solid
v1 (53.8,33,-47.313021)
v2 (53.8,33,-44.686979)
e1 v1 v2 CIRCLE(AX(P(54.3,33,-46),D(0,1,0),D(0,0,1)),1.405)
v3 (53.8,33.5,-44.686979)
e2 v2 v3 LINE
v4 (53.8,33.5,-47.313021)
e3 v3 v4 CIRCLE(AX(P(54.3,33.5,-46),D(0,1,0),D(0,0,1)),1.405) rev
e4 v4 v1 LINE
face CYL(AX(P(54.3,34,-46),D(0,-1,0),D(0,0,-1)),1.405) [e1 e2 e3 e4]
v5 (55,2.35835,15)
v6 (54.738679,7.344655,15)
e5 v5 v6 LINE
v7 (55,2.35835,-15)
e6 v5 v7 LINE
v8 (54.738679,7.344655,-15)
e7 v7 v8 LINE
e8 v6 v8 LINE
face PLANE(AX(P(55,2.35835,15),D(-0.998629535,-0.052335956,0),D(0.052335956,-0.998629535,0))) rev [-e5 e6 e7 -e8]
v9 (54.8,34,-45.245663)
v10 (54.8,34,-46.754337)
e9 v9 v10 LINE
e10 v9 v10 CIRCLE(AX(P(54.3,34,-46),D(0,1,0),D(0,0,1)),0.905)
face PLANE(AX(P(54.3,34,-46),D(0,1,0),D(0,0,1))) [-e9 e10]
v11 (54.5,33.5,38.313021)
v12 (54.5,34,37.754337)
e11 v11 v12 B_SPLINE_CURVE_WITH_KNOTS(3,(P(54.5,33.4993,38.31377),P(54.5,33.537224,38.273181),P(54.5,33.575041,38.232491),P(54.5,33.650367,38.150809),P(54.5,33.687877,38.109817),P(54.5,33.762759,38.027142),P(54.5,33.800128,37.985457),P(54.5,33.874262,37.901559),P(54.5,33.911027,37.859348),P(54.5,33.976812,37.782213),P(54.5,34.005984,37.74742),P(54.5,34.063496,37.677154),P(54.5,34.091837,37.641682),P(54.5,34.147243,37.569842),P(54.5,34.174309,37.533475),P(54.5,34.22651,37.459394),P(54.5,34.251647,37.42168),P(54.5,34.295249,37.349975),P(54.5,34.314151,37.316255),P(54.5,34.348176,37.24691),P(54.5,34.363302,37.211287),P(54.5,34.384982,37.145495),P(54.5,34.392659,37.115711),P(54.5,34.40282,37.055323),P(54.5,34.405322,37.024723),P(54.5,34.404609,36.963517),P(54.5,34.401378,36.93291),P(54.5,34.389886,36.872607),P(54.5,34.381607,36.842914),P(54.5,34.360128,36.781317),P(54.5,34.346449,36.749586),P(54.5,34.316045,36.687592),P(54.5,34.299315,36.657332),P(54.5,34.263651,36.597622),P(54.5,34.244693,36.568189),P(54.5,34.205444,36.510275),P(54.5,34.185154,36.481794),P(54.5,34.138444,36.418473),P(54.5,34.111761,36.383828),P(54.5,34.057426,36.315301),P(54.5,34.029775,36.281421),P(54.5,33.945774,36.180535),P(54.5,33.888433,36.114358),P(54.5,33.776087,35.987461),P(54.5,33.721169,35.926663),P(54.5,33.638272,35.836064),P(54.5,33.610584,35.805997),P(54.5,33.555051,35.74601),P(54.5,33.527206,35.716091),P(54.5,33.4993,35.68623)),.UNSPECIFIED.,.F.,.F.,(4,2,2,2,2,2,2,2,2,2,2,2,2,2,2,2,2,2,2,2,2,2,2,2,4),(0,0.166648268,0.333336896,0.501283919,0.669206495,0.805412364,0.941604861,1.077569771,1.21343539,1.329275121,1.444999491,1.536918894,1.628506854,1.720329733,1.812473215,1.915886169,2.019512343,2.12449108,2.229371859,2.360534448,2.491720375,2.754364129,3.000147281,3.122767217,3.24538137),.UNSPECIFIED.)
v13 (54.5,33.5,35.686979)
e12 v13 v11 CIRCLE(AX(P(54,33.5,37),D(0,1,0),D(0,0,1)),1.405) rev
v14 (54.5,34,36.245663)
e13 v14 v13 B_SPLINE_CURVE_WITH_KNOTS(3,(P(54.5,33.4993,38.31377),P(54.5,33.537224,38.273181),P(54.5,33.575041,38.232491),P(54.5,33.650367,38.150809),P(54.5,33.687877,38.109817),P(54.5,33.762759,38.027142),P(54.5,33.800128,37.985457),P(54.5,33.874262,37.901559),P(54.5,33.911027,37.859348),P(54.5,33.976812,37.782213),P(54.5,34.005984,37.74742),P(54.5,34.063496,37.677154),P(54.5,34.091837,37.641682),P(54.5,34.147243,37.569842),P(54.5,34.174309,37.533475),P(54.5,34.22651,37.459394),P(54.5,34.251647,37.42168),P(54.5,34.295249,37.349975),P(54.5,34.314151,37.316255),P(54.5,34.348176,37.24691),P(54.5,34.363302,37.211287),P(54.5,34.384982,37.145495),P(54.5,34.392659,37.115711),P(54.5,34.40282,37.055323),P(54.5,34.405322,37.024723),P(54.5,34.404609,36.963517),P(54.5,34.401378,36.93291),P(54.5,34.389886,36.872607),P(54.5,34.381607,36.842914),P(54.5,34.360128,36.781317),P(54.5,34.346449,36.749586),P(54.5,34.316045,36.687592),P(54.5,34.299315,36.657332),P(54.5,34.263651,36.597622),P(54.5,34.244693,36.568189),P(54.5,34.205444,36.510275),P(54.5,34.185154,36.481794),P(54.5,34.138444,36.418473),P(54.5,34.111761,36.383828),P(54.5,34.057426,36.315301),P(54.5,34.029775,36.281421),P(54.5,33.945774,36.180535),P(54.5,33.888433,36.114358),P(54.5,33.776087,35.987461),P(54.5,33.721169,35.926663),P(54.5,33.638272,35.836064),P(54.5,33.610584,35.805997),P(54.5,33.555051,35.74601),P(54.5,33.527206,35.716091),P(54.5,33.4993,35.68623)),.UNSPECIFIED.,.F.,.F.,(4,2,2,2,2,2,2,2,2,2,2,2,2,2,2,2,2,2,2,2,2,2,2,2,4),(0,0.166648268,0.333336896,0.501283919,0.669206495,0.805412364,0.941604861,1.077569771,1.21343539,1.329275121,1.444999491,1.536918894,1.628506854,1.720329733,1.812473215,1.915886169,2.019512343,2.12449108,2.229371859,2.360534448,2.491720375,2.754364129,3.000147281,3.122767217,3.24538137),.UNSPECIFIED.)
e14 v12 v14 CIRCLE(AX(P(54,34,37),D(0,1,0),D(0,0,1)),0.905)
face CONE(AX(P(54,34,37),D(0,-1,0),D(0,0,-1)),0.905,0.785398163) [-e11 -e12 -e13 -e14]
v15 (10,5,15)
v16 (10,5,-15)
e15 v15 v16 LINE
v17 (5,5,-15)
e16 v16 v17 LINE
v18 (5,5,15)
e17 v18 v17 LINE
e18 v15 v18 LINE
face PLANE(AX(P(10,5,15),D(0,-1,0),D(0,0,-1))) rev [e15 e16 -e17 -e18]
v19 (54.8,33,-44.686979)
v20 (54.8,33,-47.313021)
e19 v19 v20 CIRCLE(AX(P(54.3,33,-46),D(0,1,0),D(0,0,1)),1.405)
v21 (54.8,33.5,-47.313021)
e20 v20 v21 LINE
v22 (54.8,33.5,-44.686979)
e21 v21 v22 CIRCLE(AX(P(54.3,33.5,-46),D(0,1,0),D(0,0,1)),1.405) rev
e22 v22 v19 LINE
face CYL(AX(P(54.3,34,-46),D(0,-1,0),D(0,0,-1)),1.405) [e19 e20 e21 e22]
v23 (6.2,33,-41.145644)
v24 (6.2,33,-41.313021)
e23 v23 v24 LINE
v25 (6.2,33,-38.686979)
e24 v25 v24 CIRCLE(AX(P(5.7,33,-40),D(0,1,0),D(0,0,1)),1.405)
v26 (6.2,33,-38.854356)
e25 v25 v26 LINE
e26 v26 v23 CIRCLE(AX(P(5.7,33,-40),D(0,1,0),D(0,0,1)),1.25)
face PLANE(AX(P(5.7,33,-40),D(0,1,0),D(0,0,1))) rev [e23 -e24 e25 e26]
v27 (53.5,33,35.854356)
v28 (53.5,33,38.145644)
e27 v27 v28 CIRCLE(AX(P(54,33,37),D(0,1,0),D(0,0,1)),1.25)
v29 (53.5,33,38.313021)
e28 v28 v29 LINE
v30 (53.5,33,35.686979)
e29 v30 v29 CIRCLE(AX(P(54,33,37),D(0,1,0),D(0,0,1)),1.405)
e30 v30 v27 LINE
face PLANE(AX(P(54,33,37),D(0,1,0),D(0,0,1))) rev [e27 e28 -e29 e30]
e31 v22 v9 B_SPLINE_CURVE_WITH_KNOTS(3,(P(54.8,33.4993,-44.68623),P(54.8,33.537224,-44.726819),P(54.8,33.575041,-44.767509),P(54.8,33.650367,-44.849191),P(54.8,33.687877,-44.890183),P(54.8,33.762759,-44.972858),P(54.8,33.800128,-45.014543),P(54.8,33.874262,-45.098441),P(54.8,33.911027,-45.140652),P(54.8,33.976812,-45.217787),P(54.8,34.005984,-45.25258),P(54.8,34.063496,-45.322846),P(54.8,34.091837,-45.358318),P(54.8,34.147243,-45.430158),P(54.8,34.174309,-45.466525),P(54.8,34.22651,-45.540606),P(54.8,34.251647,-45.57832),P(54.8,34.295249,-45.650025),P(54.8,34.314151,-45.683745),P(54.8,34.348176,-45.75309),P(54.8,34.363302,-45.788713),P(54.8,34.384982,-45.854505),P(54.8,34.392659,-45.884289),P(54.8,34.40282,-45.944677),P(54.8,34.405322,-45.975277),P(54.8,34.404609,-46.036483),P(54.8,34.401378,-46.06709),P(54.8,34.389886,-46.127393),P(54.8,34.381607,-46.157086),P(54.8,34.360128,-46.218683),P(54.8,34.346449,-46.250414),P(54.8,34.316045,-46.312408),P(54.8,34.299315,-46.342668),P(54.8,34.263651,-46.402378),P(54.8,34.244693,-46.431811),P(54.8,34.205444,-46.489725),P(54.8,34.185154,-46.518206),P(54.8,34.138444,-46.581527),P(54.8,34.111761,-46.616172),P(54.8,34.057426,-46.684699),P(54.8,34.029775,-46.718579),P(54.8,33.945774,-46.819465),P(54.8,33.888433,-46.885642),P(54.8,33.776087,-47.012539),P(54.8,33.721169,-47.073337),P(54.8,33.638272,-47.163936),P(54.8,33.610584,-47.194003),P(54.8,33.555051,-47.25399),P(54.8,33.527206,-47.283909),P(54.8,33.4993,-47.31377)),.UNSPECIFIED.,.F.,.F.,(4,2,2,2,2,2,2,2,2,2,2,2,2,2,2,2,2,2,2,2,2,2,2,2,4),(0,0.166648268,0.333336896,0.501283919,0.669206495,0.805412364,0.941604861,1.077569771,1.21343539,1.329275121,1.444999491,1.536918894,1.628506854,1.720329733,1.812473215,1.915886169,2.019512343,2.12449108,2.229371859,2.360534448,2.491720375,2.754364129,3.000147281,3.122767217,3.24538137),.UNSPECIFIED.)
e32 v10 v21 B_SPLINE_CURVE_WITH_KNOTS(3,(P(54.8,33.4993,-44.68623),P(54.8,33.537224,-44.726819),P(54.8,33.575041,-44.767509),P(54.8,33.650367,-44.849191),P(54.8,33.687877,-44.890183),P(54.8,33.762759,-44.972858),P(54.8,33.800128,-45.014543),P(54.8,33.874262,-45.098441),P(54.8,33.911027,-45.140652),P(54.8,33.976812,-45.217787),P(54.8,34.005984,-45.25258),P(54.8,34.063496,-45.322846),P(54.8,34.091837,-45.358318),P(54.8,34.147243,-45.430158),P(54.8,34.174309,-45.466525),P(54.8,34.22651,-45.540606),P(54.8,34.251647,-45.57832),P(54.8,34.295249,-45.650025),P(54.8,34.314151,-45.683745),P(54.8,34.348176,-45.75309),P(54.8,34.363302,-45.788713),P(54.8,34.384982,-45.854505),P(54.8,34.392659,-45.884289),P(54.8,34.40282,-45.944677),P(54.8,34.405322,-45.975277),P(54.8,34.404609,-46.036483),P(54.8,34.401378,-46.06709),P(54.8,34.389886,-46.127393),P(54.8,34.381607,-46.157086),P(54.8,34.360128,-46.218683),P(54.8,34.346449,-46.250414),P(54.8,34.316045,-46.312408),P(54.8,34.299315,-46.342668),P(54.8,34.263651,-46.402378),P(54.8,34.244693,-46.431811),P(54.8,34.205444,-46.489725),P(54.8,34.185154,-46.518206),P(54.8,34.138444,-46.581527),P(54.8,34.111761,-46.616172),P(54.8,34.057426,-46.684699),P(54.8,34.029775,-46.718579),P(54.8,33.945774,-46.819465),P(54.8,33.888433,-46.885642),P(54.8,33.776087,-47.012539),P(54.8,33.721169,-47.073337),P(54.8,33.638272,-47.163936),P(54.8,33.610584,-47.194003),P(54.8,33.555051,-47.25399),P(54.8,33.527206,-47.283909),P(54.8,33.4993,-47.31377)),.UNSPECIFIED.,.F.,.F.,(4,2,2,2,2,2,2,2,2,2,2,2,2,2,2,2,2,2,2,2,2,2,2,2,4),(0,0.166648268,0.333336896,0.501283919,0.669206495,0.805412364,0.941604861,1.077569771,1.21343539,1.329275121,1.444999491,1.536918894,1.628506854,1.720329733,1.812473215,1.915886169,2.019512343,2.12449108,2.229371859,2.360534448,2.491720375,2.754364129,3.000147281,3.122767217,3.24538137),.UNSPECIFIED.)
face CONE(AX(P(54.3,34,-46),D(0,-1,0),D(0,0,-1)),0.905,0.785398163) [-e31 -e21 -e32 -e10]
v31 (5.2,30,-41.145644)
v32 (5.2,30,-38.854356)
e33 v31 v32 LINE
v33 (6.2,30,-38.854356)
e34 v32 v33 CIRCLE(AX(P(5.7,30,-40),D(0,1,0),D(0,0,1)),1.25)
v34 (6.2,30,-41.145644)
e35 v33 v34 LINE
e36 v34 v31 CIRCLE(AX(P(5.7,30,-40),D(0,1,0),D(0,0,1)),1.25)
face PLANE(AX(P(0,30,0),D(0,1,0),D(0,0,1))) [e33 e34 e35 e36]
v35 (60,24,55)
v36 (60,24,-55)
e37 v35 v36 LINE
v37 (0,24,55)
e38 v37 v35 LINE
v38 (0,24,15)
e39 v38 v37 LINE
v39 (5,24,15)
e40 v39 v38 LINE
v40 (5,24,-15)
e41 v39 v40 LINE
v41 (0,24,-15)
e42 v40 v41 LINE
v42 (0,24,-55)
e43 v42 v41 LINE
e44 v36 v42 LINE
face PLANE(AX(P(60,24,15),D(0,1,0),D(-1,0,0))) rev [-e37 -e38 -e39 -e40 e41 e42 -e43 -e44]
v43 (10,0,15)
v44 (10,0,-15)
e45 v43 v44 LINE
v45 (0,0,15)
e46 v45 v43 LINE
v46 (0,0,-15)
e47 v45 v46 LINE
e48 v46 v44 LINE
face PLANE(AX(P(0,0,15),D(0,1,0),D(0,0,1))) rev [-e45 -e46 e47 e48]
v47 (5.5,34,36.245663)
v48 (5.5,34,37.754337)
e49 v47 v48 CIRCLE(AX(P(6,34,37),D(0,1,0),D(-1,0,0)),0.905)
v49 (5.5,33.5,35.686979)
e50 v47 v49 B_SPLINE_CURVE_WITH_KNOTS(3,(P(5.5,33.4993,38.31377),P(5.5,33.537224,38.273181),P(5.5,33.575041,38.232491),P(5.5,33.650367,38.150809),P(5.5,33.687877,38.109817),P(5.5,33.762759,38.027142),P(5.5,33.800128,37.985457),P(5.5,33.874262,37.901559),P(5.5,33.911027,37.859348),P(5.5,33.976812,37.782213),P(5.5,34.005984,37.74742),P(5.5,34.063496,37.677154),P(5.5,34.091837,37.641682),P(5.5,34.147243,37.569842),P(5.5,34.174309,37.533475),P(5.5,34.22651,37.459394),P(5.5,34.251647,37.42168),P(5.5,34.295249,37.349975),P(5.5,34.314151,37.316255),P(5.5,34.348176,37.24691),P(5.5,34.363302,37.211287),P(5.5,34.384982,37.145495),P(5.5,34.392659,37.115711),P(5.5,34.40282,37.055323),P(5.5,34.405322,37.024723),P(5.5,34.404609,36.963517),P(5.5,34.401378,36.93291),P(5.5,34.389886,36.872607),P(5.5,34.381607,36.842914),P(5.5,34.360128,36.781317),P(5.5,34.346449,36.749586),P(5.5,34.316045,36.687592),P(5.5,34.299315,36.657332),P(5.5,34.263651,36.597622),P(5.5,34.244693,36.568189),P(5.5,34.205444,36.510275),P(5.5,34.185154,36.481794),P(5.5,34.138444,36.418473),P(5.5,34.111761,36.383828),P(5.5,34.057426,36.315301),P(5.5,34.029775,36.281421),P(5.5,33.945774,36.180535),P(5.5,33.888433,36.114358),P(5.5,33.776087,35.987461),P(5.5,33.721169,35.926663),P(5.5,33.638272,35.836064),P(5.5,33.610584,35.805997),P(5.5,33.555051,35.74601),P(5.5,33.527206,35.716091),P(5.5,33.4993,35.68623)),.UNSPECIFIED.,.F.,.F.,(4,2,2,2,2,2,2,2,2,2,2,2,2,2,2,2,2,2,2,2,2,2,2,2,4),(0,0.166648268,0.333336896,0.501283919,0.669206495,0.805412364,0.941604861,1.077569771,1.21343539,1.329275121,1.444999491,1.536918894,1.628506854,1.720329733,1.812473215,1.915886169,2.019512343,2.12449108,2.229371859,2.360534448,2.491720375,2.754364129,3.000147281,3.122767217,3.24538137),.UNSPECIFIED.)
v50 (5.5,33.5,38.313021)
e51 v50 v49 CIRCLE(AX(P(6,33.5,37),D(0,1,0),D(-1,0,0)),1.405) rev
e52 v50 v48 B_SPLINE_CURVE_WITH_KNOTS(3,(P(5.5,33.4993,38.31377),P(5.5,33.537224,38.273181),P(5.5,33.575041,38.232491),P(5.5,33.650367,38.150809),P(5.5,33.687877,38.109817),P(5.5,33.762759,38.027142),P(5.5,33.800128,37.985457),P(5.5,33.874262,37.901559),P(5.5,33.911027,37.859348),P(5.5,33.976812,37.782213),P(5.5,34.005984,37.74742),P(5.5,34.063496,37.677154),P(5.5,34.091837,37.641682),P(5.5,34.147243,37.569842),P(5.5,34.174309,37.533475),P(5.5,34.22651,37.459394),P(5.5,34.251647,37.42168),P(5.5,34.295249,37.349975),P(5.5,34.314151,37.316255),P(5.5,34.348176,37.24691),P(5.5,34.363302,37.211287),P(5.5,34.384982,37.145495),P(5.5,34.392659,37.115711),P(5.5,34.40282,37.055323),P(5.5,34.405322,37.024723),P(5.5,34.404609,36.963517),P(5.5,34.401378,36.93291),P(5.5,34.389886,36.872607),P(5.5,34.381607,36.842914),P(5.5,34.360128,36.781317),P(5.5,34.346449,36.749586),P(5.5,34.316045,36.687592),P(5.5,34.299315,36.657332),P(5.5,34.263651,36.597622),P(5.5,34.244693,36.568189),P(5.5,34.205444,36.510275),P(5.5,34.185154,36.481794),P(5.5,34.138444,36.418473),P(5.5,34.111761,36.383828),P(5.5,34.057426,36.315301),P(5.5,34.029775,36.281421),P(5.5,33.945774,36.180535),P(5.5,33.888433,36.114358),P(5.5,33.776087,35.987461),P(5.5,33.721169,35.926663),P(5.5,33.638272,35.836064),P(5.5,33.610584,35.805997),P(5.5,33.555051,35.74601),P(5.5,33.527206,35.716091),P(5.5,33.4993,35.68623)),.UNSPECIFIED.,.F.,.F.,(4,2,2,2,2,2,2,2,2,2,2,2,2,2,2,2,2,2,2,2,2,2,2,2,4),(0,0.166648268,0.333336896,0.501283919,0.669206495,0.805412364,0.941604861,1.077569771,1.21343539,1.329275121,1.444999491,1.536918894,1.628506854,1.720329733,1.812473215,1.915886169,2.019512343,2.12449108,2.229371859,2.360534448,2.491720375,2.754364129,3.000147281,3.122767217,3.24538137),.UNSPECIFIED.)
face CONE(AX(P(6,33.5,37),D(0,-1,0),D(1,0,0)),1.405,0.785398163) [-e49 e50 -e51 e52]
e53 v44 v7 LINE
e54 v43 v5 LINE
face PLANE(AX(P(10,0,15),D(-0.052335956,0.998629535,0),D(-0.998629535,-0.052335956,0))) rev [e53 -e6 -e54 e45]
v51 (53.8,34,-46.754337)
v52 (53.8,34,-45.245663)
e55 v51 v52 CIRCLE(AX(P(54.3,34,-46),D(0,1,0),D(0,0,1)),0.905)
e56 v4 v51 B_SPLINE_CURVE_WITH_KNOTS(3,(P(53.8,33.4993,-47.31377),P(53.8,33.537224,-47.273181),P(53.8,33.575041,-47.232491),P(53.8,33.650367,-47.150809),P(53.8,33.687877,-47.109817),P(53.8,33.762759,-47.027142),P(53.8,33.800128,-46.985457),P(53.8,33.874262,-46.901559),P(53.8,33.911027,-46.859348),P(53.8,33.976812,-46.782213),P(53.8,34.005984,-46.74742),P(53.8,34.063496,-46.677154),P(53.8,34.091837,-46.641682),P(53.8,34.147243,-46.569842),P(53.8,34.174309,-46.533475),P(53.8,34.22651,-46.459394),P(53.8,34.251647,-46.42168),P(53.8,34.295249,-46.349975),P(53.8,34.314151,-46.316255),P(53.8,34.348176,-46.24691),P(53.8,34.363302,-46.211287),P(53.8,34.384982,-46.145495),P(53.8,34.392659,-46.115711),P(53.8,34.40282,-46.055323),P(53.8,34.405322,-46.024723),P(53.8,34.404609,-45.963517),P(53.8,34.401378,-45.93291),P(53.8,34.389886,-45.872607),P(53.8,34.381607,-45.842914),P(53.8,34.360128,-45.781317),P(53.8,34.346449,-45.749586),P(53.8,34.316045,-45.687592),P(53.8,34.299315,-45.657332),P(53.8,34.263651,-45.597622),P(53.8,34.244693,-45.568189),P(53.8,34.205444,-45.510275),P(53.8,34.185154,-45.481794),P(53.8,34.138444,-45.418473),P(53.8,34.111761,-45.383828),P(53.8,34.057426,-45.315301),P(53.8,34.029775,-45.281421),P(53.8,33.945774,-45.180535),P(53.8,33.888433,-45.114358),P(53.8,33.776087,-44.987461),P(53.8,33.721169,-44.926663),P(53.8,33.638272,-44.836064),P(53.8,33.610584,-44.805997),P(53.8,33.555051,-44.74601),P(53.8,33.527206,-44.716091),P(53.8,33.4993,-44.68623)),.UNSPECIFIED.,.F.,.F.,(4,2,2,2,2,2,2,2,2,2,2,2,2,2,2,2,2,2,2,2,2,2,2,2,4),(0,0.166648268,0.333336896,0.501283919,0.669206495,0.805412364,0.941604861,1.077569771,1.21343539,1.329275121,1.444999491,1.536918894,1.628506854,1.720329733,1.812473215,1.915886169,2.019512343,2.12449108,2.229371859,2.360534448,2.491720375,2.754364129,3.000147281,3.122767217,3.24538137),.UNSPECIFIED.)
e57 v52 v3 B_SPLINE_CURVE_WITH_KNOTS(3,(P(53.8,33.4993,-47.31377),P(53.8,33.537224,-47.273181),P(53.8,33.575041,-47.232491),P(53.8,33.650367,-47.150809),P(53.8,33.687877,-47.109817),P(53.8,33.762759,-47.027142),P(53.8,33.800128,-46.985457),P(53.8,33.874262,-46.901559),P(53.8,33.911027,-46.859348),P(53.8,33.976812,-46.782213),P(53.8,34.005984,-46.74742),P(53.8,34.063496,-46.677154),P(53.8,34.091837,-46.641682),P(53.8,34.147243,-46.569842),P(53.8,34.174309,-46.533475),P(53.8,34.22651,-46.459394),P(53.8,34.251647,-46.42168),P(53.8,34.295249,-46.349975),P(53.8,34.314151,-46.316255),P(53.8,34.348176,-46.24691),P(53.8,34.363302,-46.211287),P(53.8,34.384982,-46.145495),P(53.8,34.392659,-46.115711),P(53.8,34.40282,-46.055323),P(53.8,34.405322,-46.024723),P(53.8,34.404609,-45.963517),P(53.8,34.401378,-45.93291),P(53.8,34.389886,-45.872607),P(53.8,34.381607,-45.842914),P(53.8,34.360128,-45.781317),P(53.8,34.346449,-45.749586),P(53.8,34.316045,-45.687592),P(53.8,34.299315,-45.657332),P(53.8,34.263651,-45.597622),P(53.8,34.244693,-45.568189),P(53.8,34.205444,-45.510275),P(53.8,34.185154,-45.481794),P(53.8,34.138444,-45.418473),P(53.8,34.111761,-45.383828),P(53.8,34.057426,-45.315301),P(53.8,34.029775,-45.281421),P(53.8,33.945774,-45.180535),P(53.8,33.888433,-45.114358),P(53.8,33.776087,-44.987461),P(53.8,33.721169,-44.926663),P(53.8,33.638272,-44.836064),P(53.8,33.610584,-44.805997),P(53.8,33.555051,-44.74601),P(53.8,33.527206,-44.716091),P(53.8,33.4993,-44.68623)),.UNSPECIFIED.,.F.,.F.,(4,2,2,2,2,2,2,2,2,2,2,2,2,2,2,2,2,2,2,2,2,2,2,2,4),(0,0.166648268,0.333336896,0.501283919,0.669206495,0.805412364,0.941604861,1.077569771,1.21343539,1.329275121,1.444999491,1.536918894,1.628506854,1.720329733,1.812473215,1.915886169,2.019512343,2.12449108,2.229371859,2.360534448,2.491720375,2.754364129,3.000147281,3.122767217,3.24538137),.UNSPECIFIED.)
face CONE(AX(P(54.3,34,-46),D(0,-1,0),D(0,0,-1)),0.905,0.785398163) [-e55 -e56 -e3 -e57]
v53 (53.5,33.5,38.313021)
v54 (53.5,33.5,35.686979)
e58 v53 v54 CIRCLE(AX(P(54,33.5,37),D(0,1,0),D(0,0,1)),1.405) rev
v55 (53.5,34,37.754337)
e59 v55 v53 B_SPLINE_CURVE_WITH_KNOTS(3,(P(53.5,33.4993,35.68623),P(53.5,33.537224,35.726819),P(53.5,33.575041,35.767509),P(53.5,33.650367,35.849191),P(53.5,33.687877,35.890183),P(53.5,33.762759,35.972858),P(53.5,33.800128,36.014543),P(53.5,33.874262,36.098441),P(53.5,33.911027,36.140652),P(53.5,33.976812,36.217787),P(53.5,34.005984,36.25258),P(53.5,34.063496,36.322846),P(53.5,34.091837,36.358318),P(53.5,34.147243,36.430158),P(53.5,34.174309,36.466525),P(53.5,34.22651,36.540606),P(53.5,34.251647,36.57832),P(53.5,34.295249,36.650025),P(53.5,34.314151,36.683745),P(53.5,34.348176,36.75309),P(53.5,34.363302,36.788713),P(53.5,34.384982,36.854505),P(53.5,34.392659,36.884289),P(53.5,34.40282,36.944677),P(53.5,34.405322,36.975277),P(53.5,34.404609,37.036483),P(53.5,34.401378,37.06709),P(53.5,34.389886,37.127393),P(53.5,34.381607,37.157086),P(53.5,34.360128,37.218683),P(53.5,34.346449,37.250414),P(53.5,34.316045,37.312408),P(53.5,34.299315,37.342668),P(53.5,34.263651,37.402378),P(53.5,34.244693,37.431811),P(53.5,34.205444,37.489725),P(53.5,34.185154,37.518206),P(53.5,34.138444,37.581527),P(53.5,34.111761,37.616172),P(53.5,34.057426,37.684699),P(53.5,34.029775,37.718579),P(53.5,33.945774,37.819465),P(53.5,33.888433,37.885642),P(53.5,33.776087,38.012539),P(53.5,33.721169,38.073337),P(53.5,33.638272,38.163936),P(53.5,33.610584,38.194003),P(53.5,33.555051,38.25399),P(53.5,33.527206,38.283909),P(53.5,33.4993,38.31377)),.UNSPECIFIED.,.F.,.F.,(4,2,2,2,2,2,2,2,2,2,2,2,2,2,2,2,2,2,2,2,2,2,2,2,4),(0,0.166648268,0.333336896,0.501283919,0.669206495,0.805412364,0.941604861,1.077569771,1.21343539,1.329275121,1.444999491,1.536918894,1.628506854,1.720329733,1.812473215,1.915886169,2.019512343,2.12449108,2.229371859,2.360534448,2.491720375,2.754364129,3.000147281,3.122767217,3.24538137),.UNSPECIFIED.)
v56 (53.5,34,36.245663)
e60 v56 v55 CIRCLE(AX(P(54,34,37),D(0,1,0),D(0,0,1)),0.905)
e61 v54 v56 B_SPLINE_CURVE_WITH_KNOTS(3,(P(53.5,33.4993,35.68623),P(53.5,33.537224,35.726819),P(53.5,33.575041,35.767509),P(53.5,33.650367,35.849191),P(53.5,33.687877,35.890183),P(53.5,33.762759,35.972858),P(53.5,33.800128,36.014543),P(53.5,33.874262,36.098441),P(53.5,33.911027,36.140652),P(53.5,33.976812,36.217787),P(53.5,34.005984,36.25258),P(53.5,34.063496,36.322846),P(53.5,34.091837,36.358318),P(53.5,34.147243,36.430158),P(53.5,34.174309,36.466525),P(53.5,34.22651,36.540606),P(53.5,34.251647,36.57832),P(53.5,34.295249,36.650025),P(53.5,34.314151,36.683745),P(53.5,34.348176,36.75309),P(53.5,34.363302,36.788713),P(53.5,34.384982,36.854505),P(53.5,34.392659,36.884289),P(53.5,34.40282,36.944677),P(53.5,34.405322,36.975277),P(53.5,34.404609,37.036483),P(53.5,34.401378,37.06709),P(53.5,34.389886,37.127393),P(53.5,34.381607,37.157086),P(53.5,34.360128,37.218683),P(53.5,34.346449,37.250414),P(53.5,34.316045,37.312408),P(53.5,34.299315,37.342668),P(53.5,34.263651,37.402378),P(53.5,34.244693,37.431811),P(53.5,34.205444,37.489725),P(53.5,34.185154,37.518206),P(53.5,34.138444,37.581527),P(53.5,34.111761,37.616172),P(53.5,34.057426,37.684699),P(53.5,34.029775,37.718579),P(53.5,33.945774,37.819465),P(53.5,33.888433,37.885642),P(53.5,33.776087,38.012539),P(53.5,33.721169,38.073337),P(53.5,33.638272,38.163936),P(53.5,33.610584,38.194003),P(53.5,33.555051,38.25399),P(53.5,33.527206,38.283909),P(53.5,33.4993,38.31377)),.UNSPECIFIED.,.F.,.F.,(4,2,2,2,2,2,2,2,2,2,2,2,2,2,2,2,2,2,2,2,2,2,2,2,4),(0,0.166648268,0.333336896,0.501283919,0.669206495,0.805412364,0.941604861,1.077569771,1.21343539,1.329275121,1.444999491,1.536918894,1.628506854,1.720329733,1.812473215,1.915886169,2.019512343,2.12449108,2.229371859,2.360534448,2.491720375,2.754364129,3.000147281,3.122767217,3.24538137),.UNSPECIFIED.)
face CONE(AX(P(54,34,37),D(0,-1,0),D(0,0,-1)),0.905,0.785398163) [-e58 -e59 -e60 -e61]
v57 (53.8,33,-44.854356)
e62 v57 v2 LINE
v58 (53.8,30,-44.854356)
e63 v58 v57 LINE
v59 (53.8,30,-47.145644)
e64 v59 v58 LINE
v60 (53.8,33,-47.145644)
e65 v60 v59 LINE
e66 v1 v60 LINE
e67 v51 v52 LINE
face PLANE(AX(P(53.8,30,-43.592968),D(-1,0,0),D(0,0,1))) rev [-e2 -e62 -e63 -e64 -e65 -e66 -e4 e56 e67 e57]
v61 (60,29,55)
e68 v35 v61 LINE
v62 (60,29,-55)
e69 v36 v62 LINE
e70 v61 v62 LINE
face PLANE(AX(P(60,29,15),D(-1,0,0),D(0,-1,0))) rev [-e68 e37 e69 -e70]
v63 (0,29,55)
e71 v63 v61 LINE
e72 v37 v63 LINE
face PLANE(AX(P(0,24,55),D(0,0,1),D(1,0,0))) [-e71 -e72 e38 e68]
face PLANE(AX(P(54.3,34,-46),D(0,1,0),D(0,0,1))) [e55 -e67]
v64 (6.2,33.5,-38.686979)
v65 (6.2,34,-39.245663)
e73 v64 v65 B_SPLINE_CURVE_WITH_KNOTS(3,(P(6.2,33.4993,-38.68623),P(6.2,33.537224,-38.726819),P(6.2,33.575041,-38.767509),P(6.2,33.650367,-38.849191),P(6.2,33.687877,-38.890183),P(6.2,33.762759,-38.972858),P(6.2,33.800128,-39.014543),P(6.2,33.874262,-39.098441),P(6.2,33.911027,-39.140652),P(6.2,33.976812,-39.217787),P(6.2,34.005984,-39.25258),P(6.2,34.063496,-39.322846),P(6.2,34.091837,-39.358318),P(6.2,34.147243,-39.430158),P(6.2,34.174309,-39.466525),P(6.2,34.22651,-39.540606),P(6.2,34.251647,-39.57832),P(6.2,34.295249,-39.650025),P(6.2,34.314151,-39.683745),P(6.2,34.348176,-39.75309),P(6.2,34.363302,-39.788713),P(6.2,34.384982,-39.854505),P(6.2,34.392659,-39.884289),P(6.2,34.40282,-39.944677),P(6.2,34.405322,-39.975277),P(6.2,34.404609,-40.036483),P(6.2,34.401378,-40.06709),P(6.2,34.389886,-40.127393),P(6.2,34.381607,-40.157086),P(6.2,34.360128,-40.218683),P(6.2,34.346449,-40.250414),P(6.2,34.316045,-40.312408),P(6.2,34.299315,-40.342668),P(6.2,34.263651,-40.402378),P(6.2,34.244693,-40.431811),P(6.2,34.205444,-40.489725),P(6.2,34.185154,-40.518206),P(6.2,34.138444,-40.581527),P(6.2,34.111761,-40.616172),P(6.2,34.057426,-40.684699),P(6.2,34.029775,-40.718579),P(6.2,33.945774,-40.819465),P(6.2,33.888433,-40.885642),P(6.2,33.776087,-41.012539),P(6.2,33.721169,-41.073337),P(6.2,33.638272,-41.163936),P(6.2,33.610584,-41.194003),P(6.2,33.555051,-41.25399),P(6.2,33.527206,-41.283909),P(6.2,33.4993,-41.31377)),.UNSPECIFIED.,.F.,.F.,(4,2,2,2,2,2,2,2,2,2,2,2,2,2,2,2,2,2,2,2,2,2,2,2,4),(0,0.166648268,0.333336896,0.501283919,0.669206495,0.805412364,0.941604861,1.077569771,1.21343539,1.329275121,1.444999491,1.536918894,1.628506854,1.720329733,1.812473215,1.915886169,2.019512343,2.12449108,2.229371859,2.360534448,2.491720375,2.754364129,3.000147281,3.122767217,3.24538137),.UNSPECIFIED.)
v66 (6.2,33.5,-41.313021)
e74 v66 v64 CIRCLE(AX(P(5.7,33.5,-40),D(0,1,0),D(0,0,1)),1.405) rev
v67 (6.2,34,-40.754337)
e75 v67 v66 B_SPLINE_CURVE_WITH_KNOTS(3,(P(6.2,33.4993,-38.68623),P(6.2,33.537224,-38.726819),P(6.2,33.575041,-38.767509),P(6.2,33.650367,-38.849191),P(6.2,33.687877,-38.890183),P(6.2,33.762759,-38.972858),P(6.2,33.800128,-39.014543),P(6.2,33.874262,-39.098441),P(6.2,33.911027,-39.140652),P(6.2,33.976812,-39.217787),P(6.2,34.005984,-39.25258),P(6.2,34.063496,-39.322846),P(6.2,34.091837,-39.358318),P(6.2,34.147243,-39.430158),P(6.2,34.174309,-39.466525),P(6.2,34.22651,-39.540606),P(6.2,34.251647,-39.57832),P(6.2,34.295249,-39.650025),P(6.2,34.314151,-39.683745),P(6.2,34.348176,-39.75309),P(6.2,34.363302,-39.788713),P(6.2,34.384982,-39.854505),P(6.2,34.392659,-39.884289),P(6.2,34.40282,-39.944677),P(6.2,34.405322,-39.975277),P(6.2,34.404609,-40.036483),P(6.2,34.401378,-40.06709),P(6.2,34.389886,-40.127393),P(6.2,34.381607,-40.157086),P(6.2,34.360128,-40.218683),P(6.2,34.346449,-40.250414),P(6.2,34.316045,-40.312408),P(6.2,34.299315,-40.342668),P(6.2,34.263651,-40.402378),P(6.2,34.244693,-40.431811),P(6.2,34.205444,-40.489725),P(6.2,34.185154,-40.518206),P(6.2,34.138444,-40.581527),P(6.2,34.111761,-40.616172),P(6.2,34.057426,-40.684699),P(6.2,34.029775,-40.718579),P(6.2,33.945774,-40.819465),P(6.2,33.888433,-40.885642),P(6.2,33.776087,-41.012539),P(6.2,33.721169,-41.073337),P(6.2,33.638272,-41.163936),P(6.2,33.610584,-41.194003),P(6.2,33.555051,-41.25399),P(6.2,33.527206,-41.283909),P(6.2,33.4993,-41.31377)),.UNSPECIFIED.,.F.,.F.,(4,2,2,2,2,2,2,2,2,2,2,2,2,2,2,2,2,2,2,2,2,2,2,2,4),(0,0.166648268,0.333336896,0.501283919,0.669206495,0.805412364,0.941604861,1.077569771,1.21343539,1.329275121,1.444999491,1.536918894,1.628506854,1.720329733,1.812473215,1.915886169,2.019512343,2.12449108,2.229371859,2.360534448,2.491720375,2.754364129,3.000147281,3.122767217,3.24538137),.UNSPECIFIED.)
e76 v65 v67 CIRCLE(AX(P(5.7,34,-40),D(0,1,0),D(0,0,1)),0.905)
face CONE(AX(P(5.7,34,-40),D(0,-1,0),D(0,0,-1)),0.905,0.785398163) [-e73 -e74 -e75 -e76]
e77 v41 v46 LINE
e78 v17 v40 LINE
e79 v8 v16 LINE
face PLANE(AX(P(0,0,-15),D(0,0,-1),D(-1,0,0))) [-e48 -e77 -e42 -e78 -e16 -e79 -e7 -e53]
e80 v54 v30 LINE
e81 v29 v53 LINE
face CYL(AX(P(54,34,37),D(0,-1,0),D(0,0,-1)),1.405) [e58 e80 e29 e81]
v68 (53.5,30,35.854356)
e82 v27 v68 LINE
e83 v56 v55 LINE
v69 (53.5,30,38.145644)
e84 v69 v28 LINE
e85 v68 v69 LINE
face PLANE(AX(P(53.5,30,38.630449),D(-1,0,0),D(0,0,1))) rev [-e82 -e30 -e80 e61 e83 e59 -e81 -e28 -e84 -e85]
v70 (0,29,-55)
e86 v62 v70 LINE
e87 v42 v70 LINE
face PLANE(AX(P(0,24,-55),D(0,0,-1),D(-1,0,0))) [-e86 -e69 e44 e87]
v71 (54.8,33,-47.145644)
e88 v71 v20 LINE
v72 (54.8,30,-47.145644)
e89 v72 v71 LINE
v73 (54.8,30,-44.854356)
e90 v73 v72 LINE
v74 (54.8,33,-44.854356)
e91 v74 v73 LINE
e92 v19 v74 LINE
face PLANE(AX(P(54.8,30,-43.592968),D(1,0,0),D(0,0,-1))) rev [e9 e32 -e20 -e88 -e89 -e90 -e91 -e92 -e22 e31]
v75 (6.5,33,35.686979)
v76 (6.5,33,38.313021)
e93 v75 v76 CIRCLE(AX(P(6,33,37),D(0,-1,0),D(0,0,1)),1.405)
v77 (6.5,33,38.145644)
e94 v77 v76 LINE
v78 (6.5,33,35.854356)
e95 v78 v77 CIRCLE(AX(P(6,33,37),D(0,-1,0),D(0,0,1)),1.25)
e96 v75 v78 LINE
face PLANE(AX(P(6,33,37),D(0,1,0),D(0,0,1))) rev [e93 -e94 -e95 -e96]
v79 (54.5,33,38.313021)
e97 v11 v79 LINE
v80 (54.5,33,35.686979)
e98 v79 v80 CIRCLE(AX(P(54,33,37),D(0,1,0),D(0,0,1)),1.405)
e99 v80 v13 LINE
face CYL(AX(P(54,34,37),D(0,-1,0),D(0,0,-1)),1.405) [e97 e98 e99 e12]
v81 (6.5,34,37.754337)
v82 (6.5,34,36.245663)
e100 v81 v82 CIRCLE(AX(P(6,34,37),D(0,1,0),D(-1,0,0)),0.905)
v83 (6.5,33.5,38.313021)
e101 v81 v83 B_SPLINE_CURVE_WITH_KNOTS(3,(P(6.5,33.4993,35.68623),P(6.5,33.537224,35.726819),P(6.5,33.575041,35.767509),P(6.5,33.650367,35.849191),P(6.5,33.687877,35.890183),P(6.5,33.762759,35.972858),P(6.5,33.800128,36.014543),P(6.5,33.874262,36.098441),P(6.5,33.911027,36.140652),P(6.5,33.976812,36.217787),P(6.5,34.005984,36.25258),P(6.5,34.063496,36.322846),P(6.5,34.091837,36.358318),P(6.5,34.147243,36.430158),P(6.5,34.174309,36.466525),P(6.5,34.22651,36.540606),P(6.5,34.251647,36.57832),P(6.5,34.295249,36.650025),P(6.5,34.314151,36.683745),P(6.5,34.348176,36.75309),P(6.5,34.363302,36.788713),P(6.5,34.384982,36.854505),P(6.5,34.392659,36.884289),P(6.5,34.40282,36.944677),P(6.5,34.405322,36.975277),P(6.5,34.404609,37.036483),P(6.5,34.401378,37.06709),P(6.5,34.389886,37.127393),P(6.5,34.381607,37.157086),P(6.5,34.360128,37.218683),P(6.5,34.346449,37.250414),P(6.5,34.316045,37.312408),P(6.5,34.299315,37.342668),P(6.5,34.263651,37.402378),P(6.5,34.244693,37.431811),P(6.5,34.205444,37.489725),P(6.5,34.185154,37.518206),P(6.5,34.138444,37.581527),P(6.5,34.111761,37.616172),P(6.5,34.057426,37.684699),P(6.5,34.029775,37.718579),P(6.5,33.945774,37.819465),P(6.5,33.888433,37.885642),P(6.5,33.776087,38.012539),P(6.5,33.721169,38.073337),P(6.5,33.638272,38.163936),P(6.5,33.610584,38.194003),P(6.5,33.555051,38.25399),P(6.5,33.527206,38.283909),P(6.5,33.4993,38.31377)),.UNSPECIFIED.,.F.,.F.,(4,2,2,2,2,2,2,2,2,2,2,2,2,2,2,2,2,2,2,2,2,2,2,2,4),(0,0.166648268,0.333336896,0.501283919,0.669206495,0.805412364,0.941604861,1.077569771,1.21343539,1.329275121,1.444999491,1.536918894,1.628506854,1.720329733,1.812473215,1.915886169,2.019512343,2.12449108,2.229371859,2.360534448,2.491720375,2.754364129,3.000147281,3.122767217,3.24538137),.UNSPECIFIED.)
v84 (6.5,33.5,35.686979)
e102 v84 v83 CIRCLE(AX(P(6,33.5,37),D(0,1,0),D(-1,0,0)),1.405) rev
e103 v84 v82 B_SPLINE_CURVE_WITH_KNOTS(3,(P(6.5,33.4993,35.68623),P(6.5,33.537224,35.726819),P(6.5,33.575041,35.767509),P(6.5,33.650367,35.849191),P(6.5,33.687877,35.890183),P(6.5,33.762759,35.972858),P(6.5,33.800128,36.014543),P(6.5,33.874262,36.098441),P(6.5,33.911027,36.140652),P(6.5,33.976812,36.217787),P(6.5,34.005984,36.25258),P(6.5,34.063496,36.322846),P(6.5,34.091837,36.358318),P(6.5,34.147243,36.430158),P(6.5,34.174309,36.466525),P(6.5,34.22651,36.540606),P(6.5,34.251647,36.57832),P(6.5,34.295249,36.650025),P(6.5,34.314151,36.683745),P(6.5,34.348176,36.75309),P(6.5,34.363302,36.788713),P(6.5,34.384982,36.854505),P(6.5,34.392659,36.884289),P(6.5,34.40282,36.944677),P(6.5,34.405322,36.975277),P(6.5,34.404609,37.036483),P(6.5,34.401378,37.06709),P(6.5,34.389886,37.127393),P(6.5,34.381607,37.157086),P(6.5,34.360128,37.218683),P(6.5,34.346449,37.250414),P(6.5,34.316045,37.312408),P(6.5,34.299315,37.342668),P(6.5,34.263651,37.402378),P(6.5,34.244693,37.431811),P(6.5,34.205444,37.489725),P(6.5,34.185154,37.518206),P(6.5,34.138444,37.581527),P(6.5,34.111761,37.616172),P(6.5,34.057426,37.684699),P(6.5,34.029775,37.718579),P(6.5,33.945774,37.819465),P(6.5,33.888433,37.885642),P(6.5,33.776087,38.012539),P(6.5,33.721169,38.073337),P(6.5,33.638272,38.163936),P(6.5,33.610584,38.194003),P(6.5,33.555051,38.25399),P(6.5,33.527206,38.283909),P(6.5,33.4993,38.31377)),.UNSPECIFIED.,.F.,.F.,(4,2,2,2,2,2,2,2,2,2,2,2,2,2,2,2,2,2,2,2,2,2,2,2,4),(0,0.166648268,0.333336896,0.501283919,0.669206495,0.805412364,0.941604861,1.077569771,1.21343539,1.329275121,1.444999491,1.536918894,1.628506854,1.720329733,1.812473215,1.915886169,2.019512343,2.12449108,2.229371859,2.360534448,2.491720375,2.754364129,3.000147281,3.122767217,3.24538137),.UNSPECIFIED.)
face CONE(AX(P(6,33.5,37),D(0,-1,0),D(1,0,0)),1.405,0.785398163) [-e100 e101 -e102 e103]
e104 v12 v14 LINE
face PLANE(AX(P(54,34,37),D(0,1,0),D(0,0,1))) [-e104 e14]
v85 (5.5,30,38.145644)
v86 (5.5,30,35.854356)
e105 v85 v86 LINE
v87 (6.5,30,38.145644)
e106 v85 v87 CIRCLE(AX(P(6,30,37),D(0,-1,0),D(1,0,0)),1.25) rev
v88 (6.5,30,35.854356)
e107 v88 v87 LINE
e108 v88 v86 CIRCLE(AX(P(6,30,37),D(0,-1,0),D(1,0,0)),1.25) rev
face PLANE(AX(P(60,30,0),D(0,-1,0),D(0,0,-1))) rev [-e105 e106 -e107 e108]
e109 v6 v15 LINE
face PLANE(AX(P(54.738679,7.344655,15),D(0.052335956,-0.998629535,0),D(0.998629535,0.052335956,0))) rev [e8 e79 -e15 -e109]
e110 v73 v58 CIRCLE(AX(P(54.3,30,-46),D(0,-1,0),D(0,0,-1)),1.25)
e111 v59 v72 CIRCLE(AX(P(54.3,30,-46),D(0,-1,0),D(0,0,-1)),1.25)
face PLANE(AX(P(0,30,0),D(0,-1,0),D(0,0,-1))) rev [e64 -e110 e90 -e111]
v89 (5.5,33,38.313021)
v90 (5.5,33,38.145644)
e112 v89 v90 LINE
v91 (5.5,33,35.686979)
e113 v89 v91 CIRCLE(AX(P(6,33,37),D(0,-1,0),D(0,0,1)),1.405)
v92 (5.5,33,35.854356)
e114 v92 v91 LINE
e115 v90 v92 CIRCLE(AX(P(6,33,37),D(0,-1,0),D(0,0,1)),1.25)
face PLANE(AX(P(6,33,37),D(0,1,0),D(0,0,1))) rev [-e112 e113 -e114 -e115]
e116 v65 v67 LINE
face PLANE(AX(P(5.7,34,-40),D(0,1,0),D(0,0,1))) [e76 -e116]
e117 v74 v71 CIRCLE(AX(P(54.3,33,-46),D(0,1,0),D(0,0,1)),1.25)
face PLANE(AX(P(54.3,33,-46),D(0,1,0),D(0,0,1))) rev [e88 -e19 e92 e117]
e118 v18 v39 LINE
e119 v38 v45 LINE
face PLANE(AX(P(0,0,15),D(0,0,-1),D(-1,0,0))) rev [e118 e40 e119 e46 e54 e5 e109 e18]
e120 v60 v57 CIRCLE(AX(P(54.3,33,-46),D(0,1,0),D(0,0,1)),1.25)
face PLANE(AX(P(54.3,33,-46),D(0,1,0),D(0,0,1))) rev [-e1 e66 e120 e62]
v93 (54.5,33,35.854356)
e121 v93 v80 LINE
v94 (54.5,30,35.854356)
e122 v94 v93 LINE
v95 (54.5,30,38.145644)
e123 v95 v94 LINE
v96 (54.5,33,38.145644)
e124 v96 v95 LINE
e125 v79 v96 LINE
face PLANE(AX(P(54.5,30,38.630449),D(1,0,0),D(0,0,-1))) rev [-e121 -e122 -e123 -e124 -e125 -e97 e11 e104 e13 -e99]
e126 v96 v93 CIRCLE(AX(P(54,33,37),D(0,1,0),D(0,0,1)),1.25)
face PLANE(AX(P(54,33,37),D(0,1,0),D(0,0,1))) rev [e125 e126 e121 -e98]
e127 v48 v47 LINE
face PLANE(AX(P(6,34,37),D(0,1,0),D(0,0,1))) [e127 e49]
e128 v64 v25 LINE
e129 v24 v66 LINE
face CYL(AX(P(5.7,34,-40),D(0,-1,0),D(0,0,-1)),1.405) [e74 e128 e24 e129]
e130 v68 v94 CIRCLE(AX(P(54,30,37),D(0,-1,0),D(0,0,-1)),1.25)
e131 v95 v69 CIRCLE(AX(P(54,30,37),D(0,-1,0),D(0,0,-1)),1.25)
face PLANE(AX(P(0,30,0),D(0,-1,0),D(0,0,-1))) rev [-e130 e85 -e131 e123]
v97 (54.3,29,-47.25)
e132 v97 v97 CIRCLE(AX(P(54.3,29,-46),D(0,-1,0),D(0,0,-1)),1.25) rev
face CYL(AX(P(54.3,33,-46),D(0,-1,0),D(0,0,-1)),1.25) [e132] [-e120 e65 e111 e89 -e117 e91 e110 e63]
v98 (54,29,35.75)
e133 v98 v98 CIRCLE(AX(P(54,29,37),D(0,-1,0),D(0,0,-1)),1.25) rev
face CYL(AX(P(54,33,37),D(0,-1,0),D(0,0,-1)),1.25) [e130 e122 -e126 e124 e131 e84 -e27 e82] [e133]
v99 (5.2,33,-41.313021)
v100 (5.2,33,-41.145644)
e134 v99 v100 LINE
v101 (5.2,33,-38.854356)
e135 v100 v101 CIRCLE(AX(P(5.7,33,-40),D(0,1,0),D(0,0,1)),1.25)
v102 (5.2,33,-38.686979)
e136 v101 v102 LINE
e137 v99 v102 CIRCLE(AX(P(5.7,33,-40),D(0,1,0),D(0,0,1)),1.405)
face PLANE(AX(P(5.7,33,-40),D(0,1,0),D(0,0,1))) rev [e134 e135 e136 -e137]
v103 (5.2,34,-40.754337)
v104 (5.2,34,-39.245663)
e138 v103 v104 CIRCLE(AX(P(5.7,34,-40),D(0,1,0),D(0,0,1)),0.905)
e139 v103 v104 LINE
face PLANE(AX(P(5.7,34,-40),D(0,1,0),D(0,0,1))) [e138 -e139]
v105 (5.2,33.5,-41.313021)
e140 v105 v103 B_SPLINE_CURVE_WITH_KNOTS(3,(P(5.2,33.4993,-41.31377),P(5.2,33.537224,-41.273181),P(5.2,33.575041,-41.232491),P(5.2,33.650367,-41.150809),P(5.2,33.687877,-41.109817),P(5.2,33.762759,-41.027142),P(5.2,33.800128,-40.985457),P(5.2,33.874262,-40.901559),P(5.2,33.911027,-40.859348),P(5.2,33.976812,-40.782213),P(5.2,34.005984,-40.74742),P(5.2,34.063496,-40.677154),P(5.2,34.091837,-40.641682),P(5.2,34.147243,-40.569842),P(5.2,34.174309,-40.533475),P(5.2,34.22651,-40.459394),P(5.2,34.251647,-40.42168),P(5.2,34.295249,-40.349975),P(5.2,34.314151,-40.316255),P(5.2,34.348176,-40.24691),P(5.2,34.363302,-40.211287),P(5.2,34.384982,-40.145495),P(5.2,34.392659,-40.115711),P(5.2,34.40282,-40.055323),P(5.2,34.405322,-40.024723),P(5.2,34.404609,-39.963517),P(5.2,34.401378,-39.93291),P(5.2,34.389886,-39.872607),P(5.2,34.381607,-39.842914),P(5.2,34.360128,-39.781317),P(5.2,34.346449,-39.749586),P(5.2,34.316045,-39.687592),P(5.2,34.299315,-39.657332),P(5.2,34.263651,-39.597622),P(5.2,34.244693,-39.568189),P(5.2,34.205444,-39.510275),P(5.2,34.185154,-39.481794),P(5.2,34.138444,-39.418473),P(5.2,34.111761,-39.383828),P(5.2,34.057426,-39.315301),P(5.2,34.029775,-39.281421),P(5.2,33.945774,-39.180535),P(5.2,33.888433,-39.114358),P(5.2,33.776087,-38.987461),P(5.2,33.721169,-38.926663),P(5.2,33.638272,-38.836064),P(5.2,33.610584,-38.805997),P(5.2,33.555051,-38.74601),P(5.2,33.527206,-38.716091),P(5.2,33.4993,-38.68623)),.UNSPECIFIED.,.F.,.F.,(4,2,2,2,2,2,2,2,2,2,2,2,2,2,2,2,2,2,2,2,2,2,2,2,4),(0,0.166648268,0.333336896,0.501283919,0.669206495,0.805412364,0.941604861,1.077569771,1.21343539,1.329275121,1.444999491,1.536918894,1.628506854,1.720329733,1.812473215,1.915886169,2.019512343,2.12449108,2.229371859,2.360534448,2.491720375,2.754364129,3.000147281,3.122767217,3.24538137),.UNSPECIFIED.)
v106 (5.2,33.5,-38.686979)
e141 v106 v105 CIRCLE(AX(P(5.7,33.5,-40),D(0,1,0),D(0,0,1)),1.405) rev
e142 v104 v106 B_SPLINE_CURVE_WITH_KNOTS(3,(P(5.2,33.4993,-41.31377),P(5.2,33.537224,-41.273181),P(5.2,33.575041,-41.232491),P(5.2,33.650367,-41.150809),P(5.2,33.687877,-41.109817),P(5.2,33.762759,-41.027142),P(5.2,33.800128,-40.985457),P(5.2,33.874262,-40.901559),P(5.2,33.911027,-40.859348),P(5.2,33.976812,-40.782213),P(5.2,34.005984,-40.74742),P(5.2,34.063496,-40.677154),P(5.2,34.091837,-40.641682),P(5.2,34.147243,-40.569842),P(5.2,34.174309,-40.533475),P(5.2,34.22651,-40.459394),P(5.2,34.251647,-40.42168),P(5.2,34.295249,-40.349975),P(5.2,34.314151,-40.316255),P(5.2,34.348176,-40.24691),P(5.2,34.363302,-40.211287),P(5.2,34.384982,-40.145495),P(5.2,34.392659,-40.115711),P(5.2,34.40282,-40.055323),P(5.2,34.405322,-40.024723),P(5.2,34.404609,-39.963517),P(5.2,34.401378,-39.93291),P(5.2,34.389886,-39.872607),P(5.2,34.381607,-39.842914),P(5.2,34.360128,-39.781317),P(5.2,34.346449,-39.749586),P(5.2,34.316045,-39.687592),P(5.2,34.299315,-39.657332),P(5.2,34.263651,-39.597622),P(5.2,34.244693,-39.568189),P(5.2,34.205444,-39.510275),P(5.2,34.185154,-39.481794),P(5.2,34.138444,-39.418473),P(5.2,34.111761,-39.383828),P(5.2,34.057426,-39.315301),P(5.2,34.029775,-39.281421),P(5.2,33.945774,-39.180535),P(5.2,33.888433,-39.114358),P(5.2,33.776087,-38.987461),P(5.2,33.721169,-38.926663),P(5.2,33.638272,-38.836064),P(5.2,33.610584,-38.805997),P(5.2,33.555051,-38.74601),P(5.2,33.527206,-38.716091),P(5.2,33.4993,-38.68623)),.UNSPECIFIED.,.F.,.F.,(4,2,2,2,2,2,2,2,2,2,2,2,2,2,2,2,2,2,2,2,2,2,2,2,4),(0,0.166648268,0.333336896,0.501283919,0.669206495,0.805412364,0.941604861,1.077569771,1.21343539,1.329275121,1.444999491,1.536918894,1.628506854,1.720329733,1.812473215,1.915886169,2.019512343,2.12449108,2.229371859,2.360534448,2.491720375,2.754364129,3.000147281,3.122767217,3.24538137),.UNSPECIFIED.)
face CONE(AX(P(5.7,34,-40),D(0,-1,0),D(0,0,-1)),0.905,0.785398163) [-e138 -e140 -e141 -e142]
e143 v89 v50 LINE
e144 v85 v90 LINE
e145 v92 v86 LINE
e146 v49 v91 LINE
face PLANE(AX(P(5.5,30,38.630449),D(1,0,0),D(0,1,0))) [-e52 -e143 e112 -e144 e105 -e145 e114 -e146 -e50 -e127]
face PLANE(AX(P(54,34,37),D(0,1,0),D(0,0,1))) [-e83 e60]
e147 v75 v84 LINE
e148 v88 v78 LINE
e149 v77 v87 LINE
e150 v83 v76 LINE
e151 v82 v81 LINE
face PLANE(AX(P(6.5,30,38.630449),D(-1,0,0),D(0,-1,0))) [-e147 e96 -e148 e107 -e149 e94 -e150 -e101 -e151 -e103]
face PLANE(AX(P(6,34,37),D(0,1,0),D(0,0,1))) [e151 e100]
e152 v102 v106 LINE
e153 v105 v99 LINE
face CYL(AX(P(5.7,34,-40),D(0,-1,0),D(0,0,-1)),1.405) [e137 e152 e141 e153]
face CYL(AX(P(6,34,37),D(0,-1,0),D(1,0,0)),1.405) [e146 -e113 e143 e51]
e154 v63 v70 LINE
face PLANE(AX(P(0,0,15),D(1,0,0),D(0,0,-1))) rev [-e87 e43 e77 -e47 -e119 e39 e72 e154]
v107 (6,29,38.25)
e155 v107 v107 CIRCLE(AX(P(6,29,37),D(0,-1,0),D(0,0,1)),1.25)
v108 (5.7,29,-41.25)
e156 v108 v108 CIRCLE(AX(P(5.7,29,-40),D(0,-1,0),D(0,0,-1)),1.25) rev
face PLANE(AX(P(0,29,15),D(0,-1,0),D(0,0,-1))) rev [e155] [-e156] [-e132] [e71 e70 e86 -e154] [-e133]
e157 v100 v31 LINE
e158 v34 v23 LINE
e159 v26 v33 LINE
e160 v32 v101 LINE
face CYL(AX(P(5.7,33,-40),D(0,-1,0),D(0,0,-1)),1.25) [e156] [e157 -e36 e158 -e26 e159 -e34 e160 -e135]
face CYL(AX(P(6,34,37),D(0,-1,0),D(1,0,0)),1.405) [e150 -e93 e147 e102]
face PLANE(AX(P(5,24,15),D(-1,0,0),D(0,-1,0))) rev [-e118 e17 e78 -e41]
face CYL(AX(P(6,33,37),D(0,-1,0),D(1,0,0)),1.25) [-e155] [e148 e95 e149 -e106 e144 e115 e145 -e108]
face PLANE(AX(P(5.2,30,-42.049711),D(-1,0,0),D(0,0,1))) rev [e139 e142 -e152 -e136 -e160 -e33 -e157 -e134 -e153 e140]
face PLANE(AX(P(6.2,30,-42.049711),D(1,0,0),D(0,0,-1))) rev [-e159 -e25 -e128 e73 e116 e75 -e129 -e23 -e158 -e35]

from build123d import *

# Parameters (mm, degrees)
BOSS_EXTRUDE1_DEPTH = 15
SKETCH2_W           = 60
SKETCH2_H           = 110
BOSS_EXTRUDE2_DEPTH = 5
SKETCH3_R           = 1.25
BOSS_EXTRUDE3_DEPTH = 4
SKETCH4_R           = 1.405
BOSS_EXTRUDE4_DEPTH = 1
CHAMFER1_SIZE       = 0.5
SKETCH5_W           = 1
SKETCH5_H           = 3.260897444
CUT_EXTRUDE1_DEPTH  = 4
MIRROR1_START       = 28
MIRROR1_DEPTH       = 6
MIRROR1_2_DEPTH     = 2
MIRROR1_START_2     = 33
MIRROR1_3_DEPTH     = 1
SKETCH7_R           = 1.25
BOSS_EXTRUDE5_DEPTH = 4
SKETCH8_R           = 1.405
BOSS_EXTRUDE6_DEPTH = 1
CHAMFER2_SIZE       = 0.5
SKETCH9_W           = 1
SKETCH9_H           = 4.099421272
SKETCH9_H_2         = 4.814063164
CUT_EXTRUDE2_DEPTH  = 4


with BuildPart() as part:
    # Sketch1 → Boss-Extrude1 (new, symmetric)
    with BuildSketch(Plane.XY):
        Polygon((0, 0), (10, 0), (55, 2.358350068), (54.738678842, 7.344654806), (10, 5), (5, 5), (5, 24), (60, 24), (60, 29), (0, 29), align=None)
    extrude(amount=BOSS_EXTRUDE1_DEPTH, both=True)

    # Sketch2 → Boss-Extrude2 (add)
    with BuildSketch(Plane(origin=(0, 29, 0), x_dir=(1, 0, 0), z_dir=(0, 1, 0))):
        with Locations((30, 0)):
            Rectangle(SKETCH2_W, SKETCH2_H)
    extrude(amount=-BOSS_EXTRUDE2_DEPTH)

    # Sketch3 → Boss-Extrude3 (add)
    with BuildSketch(Plane(origin=(0, 29, 0), x_dir=(1, 0, 0), z_dir=(0, 1, 0))):
        with Locations(Location((54, -37, 0), (0, 0, 90))):
            Circle(SKETCH3_R)
    extrude(amount=BOSS_EXTRUDE3_DEPTH)

    # Sketch4 → Boss-Extrude4 (add)
    with BuildSketch(Plane(origin=(0, 33, 0), x_dir=(1, 0, 0), z_dir=(0, 1, 0))):
        with Locations(Location((54, -37, 0), (0, 0, 270))):
            Circle(SKETCH4_R)
    extrude(amount=BOSS_EXTRUDE4_DEPTH)

    # Chamfer1
    chamfer1_edges = [part.edges().sort_by_distance(p)[0] for p in [
        (54, 34, 35.595),
    ]]
    chamfer(chamfer1_edges, length=CHAMFER1_SIZE)

    # Sketch5 → Cut-Extrude1 (cut)
    with BuildSketch(Plane(origin=(0, 34, 0), x_dir=(1, 0, 0), z_dir=(0, 1, 0))):
        with Locations((54, -37)):
            Rectangle(SKETCH5_W, SKETCH5_H)
    extrude(amount=-CUT_EXTRUDE1_DEPTH, mode=Mode.SUBTRACT)

    # Mirror1: read off the stored shape, not the designer's step
    # Mirror1 outline → Mirror1 (add)
    with BuildSketch(Plane(origin=(0, 0, 0), x_dir=(1, 0, 0), z_dir=(0, 1, 0)).offset(MIRROR1_START)):
        with BuildLine():
            ThreePointArc((6.5, -38.145643924), (7.25, -37), (6.5, -35.854356076))
            Line((6.5, -35.854356076), (6.5, -38.145643924))
        make_face()
        with BuildLine():
            Line((5.5, -38.145643924), (5.5, -35.854356076))
            ThreePointArc((5.5, -35.854356076), (4.75, -37), (5.5, -38.145643924))
        make_face()
    extrude(amount=MIRROR1_DEPTH)

    # Mirror1 2 outline → Mirror1 2 (add)
    with BuildSketch(Plane(origin=(0, 0, 0), x_dir=(1, 0, 0), z_dir=(0, 1, 0)).offset(MIRROR1_START)):
        with BuildLine():
            Line((6.5, -38.145643924), (6.5, -35.854356076))
            ThreePointArc((6.5, -35.854356076), (6, -35.75), (5.5, -35.854356076))
            Line((5.5, -35.854356076), (5.5, -38.145643924))
            ThreePointArc((5.5, -38.145643924), (6, -38.25), (6.5, -38.145643924))
        make_face()
    extrude(amount=MIRROR1_2_DEPTH)

    # Mirror1 3 outline → Mirror1 3 (add)
    with BuildSketch(Plane(origin=(0, 0, 0), x_dir=(1, 0, 0), z_dir=(0, 1, 0)).offset(MIRROR1_START_2)):
        with BuildLine():
            ThreePointArc((6.5, -35.854356076), (7.25, -37), (6.5, -38.145643924))
            Line((6.5, -38.145643924), (6.5, -38.313021325))
            ThreePointArc((6.5, -38.313021325), (7.405, -37), (6.5, -35.686978675))
            Line((6.5, -35.686978675), (6.5, -35.854356076))
        make_face()
        with BuildLine():
            ThreePointArc((5.5, -38.145643924), (4.75, -37), (5.5, -35.854356076))
            Line((5.5, -35.854356076), (5.5, -35.686978675))
            ThreePointArc((5.5, -35.686978675), (4.595, -37), (5.5, -38.313021325))
            Line((5.5, -38.313021325), (5.5, -38.145643924))
        make_face()
    extrude(amount=MIRROR1_3_DEPTH)

    # Mirror1 4 outline → Mirror1 4 (revolve, cut)
    with BuildSketch(Plane(origin=(6, 0, 37), x_dir=(1, 0, 0), z_dir=(0, 0, 1))):
        Polygon((1.405000007, 34.00000007), (0.90499993, 34.00000007), (1.405000007, 33.499999993), align=None)
    revolve(axis=Axis((6, 0, 37), (0, 1, 0)), mode=Mode.SUBTRACT)

    # Sketch7 → Boss-Extrude5 (add)
    with BuildSketch(Plane(origin=(0, 29, 0), x_dir=(1, 0, 0), z_dir=(0, 1, 0))):
        with Locations(Location((54.3, 46, 0), (0, 0, 90))):
            Circle(SKETCH7_R)
        with Locations(Location((5.7, 40, 0), (0, 0, 90))):
            Circle(SKETCH7_R)
    extrude(amount=BOSS_EXTRUDE5_DEPTH)

    # Sketch8 → Boss-Extrude6 (add)
    with BuildSketch(Plane(origin=(0, 33, 0), x_dir=(1, 0, 0), z_dir=(0, 1, 0))):
        with Locations(Location((5.7, 40, 0), (0, 0, 270))):
            Circle(SKETCH8_R)
        with Locations(Location((54.3, 46, 0), (0, 0, 270))):
            Circle(SKETCH8_R)
    extrude(amount=BOSS_EXTRUDE6_DEPTH)

    # Chamfer2
    chamfer2_edges = [part.edges().sort_by_distance(p)[0] for p in [
        (5.7, 34, -41.405),
        (54.3, 34, -47.405),
    ]]
    chamfer(chamfer2_edges, length=CHAMFER2_SIZE)

    # Sketch9 → Cut-Extrude2 (cut)
    with BuildSketch(Plane(origin=(0, 34, 0), x_dir=(1, 0, 0), z_dir=(0, 1, 0))):
        with Locations((5.7, 40)):
            Rectangle(SKETCH9_W, SKETCH9_H)
        with Locations((54.3, 46)):
            Rectangle(SKETCH9_W, SKETCH9_H_2)
    extrude(amount=-CUT_EXTRUDE2_DEPTH, mode=Mode.SUBTRACT)


solid = part.part
